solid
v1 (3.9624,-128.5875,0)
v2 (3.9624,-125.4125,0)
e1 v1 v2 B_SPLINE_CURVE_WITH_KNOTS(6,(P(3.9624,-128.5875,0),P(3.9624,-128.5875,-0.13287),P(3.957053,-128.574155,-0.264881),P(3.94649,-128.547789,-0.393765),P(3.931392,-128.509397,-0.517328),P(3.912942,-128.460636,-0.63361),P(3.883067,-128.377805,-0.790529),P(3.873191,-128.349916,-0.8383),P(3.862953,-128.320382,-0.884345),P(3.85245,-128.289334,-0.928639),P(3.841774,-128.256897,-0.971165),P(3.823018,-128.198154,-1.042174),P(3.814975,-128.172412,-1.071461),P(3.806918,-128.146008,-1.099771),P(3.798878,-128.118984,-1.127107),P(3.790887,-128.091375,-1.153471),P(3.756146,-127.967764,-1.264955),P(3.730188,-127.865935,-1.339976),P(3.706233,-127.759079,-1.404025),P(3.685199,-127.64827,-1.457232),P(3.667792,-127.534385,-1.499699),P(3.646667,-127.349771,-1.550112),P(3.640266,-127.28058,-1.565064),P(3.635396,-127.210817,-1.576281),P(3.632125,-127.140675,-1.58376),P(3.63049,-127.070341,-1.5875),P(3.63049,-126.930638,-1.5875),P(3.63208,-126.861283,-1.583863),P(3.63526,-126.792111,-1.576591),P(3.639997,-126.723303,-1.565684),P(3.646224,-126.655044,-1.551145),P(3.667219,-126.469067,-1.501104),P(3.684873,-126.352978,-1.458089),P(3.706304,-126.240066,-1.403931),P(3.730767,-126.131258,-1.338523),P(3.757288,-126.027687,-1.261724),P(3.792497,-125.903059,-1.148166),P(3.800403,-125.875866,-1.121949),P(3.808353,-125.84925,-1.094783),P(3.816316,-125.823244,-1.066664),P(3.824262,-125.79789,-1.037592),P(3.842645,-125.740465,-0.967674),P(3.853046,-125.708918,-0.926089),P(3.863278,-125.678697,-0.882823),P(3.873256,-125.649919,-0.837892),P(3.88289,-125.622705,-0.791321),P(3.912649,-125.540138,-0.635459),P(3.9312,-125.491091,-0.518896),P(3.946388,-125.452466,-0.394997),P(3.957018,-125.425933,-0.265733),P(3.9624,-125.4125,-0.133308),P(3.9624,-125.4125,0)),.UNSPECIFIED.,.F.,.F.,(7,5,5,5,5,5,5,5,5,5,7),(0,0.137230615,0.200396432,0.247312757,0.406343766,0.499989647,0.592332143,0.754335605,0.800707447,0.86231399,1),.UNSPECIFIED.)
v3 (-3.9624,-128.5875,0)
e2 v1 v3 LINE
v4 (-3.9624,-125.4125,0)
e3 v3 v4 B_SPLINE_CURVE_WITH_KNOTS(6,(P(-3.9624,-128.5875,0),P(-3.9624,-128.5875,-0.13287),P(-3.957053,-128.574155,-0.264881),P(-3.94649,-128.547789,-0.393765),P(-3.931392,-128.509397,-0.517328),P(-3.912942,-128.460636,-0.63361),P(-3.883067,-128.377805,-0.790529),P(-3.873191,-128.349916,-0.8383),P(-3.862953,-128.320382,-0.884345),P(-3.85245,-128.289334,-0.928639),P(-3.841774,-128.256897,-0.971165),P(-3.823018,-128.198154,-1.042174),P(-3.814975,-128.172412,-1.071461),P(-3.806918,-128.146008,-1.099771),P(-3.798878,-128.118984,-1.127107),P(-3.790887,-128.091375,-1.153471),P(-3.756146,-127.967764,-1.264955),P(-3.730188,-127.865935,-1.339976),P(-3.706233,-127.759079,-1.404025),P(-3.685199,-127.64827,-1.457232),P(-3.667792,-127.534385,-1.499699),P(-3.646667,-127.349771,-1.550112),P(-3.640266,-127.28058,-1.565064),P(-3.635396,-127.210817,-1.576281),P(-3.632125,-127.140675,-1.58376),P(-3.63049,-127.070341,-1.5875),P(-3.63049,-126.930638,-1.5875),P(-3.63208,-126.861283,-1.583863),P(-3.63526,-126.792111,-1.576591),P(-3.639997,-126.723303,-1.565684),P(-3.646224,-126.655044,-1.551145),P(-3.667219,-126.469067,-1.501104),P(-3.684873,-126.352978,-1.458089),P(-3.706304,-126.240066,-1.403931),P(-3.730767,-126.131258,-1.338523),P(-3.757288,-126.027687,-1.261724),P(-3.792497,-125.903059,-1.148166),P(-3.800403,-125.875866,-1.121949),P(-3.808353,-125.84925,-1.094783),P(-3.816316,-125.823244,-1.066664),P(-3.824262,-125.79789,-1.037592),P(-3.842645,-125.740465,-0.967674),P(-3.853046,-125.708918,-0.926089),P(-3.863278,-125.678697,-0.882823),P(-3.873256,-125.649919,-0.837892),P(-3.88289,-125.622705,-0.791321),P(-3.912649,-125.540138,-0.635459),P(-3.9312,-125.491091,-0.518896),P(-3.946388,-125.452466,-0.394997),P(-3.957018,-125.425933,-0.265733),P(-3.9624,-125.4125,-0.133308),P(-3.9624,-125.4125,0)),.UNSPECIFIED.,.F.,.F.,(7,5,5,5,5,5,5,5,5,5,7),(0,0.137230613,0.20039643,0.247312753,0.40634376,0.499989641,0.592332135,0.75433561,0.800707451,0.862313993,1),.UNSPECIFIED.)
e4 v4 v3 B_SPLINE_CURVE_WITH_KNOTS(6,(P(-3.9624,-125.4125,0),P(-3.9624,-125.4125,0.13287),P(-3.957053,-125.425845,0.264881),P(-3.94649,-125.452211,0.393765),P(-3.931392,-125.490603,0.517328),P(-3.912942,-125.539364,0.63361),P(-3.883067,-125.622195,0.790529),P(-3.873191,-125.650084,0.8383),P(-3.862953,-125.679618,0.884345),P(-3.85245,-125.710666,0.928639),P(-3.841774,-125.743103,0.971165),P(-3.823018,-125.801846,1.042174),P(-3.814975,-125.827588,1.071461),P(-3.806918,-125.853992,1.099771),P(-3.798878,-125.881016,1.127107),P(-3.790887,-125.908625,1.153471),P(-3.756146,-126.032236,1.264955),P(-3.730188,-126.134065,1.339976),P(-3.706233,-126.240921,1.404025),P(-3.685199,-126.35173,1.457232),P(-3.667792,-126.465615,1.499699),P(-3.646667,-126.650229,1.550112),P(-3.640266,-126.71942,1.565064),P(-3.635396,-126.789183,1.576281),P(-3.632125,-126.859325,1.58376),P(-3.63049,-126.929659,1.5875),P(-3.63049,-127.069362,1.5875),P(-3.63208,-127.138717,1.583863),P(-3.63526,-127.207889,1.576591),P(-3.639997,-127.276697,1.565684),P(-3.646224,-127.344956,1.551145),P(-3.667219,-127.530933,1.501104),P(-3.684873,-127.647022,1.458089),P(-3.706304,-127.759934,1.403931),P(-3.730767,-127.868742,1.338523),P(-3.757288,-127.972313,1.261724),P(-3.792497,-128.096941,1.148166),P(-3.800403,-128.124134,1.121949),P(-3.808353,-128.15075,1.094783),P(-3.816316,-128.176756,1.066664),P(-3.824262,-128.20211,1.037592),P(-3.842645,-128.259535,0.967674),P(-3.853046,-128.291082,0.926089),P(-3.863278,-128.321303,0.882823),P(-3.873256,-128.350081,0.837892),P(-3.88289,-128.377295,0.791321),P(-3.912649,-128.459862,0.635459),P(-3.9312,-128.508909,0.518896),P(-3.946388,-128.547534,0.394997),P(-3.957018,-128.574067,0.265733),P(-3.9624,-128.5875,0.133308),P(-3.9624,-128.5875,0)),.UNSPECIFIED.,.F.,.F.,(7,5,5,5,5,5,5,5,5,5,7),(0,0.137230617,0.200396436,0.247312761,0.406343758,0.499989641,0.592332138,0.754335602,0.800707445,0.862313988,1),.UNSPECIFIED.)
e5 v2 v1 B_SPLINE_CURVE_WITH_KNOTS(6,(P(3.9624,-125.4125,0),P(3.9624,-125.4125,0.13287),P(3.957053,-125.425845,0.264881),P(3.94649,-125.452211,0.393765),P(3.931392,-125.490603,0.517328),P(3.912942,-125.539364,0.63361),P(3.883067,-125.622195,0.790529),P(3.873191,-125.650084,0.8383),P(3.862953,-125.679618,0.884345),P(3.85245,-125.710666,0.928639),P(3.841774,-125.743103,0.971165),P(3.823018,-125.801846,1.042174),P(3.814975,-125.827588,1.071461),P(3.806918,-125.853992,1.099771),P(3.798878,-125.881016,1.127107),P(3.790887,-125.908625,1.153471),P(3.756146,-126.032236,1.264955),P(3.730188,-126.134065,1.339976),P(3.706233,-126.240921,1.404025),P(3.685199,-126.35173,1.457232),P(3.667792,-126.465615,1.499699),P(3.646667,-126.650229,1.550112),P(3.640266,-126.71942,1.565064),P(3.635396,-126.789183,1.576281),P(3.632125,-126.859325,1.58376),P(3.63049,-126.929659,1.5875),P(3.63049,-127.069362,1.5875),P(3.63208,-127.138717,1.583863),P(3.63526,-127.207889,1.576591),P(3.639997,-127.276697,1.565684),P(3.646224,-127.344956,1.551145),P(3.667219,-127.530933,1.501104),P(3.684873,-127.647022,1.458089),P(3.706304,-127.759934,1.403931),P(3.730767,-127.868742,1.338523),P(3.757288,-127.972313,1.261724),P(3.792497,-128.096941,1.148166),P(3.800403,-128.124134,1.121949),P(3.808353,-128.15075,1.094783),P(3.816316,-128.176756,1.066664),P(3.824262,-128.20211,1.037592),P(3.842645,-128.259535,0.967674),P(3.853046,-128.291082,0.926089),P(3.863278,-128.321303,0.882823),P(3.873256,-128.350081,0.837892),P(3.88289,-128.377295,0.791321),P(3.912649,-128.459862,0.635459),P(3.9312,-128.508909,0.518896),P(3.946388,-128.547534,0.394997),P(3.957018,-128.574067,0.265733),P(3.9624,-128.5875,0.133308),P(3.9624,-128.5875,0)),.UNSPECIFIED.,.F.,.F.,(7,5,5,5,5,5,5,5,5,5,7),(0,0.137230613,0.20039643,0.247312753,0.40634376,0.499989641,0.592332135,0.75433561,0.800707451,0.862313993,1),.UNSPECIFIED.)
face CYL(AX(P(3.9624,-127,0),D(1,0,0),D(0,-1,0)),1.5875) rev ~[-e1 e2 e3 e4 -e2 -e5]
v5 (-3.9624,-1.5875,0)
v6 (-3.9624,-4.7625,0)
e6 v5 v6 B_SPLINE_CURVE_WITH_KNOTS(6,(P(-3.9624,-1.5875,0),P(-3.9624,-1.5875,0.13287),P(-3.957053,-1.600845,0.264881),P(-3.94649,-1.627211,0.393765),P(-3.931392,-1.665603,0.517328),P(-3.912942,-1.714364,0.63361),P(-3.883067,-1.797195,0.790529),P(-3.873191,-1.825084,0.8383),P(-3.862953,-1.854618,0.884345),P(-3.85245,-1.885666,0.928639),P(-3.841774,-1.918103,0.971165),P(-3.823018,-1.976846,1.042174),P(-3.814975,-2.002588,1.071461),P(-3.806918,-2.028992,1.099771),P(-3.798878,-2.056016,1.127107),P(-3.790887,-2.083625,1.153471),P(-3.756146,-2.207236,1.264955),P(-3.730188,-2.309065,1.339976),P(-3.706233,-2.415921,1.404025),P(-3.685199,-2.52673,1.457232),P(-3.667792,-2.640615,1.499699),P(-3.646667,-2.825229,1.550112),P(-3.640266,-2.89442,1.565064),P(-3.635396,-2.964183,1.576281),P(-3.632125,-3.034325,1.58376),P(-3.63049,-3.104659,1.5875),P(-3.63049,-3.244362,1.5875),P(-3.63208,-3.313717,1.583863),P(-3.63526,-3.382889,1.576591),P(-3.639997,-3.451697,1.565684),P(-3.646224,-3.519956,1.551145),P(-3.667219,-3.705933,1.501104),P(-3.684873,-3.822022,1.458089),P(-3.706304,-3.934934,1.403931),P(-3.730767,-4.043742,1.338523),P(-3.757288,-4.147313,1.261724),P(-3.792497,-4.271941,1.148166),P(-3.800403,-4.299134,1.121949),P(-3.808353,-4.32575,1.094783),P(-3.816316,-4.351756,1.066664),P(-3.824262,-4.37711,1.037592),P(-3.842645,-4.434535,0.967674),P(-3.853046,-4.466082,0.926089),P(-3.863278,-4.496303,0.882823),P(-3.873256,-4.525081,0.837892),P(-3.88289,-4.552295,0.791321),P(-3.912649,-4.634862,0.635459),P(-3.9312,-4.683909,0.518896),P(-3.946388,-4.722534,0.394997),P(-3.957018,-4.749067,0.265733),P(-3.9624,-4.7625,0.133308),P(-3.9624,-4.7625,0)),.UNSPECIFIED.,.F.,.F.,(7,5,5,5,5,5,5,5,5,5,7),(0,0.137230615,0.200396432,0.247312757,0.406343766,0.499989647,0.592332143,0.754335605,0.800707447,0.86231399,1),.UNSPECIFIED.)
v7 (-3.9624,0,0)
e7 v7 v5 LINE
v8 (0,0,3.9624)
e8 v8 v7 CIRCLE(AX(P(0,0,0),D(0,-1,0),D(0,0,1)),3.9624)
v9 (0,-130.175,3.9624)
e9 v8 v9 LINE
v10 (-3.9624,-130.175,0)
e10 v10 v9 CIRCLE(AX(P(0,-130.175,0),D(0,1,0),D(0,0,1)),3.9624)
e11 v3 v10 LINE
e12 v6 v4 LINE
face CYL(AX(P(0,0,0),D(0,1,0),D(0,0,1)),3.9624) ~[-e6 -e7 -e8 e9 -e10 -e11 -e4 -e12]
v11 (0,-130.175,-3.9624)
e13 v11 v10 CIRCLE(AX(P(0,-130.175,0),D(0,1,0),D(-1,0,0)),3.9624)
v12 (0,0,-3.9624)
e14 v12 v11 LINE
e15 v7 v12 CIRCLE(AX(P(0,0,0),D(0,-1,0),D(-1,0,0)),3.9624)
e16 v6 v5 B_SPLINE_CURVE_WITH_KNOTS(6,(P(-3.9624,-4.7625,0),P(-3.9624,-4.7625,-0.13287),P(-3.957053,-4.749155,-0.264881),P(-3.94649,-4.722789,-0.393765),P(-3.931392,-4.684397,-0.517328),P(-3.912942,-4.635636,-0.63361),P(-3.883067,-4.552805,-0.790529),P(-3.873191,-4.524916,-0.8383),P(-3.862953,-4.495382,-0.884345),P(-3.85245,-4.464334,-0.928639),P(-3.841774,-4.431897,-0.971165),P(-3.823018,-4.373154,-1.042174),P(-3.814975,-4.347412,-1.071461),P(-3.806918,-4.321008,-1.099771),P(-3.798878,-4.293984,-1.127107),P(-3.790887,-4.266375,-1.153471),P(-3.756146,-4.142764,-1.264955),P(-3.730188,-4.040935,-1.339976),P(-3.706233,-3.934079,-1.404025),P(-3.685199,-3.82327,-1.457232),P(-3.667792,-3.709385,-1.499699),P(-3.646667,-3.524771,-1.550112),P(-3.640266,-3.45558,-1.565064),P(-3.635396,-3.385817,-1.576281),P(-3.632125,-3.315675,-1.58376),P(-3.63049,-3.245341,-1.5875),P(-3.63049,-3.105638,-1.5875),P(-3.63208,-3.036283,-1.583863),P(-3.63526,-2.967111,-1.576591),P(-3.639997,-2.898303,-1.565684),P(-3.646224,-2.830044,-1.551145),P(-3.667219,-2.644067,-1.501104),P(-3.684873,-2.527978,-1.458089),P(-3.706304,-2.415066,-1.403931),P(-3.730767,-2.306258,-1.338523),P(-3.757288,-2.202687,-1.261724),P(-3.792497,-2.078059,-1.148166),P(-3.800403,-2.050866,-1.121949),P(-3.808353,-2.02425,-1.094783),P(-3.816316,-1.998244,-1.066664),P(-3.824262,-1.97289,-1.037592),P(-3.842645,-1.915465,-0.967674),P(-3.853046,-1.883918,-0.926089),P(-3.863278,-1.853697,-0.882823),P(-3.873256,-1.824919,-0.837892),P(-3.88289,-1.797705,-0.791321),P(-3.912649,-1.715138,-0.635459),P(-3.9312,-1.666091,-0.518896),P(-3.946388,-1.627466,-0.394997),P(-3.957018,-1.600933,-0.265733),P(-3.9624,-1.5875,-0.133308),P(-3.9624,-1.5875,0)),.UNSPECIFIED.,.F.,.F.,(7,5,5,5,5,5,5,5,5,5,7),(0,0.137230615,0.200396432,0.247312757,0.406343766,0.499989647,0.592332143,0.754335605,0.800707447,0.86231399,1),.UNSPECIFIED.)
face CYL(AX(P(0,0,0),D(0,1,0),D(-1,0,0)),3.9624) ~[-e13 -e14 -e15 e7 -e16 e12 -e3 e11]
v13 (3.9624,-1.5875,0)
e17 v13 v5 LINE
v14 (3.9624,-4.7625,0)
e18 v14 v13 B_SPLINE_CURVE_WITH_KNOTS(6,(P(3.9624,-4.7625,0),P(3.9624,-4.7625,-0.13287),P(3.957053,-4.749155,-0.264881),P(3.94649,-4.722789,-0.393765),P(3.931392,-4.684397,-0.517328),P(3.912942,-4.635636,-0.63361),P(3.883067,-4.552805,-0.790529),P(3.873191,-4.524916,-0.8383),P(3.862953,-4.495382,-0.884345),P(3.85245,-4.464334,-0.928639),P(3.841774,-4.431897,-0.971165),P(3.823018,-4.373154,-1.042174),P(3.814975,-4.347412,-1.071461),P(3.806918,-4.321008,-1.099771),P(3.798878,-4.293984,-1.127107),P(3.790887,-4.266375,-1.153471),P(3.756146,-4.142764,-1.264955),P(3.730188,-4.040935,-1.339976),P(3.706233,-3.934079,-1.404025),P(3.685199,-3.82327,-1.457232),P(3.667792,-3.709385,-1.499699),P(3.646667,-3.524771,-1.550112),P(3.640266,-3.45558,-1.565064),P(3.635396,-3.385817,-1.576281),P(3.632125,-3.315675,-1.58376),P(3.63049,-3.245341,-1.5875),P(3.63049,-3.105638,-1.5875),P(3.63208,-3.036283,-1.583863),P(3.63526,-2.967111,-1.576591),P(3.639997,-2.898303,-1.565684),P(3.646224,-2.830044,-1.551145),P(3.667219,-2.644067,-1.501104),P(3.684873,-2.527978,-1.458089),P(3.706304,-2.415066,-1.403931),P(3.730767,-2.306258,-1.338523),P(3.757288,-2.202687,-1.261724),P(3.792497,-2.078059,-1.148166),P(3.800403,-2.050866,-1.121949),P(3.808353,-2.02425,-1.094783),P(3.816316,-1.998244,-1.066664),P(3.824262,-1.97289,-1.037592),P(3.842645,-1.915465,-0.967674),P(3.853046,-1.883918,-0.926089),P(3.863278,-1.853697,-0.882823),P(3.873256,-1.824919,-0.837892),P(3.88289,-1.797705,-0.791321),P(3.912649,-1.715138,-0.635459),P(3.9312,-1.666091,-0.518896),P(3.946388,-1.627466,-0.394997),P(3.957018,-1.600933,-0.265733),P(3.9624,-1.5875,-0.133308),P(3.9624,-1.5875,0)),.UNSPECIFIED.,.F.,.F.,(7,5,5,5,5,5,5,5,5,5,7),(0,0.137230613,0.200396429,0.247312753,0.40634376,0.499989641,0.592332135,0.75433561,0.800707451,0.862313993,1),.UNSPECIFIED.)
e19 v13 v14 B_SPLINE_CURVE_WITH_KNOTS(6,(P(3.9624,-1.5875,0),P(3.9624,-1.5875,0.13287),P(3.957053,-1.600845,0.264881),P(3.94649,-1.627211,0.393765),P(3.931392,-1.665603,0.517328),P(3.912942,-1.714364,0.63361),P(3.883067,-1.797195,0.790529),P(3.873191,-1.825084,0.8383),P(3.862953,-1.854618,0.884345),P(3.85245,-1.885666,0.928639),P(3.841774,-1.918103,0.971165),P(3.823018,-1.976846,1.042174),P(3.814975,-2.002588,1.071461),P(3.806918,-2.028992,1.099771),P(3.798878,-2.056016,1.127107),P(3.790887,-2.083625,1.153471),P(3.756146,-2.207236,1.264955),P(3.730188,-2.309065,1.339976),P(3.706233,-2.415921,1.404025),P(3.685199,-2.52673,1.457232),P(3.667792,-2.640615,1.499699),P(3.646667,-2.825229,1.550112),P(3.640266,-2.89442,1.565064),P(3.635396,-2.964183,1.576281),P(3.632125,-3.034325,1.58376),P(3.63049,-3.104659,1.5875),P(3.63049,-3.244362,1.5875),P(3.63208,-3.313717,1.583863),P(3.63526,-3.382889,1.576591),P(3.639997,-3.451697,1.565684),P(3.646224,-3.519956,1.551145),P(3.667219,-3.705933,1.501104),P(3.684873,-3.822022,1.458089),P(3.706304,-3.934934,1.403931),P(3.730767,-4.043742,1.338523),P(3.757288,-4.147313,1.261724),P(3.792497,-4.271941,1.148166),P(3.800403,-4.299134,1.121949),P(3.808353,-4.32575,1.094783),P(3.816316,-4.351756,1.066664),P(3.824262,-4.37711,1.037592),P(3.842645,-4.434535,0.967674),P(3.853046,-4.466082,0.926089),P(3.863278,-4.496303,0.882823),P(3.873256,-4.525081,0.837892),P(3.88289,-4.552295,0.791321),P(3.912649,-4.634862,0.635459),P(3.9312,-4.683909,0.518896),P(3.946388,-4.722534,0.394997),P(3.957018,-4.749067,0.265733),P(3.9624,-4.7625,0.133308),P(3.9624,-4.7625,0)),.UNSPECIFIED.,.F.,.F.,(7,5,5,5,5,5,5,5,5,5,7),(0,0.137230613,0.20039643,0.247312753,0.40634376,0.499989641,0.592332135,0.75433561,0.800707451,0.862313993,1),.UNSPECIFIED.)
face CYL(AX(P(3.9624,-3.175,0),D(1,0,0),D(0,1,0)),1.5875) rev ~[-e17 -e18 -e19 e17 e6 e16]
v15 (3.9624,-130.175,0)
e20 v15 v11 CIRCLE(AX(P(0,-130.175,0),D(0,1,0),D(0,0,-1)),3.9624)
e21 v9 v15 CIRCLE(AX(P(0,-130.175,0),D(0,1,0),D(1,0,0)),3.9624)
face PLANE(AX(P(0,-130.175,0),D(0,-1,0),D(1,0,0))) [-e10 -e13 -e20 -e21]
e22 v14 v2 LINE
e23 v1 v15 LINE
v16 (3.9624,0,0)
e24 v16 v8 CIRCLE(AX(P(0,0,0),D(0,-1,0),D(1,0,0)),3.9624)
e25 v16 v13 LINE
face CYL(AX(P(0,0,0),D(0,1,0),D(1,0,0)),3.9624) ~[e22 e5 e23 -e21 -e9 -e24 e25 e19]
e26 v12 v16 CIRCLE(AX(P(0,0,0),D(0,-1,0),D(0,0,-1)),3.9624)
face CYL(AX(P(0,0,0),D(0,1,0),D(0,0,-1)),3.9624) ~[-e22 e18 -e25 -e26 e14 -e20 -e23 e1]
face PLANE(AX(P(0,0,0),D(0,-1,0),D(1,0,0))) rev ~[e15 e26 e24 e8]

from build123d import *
from build123d import SkipClean  # not in build123d's __all__

# Parameters (mm, degrees)
F0_W     = 7.9248
F0_H     = 7.9248
F1_DEPTH = 130.175
F2_R     = 1.5875
F3_DEPTH = 25.4
F5_DEPTH = 508


with BuildPart() as f1:
    # F0 (on Front) → F1 (new body)
    with BuildSketch(Plane.XZ):
        Rectangle(F0_W, F0_H)
    extrude(amount=F1_DEPTH)

    # F2 (on face) → F3 (cut)
    with BuildSketch(Plane.YZ.offset(3.9624)):
        with BuildLine():
            ThreePointArc((-125.4125, 0), (-127, 1.5875), (-128.5875, 0))
            ThreePointArc((-128.5875, 0), (-127, -1.5875), (-125.4125, 0))
        make_face()
        with Locations((-3.175, 0)):
            Circle(F2_R)
    extrude(amount=-F3_DEPTH, mode=Mode.SUBTRACT)

    # F4 (on face) → F5 (cut)
    with BuildSketch(Plane(origin=(0, 0, 0), x_dir=(-1, 0, 0), z_dir=(0, 1, 0))):
        with BuildLine():
            ThreePointArc((-3.9624, 0), (-2.8018399098, 2.8018399098), (0, 3.9624))
            Line((0, 3.9624), (-3.9624, 3.9624))
            Line((-3.9624, 3.9624), (-3.9624, 0))
        make_face()
        with BuildLine():
            ThreePointArc((0, 3.9624), (2.8018399098, 2.8018399098), (3.9624, 0))
            Line((3.9624, 0), (3.9624, 3.9624))
            Line((3.9624, 3.9624), (0, 3.9624))
        make_face()
        with BuildLine():
            Line((3.9624, -3.9624), (3.9624, 0))
            ThreePointArc((3.9624, 0), (2.8018399098, -2.8018399098), (0, -3.9624))
            Line((0, -3.9624), (3.9624, -3.9624))
        make_face()
        with BuildLine():
            Line((-3.9624, -3.9624), (0, -3.9624))
            ThreePointArc((0, -3.9624), (-2.8018399098, -2.8018399098), (-3.9624, 0))
            Line((-3.9624, 0), (-3.9624, -3.9624))
        make_face()
    with SkipClean():  # cleaning this boolean's faces spoils the solid; the shape is the same uncleaned
        extrude(amount=-F5_DEPTH, mode=Mode.SUBTRACT)


solid = f1.part
